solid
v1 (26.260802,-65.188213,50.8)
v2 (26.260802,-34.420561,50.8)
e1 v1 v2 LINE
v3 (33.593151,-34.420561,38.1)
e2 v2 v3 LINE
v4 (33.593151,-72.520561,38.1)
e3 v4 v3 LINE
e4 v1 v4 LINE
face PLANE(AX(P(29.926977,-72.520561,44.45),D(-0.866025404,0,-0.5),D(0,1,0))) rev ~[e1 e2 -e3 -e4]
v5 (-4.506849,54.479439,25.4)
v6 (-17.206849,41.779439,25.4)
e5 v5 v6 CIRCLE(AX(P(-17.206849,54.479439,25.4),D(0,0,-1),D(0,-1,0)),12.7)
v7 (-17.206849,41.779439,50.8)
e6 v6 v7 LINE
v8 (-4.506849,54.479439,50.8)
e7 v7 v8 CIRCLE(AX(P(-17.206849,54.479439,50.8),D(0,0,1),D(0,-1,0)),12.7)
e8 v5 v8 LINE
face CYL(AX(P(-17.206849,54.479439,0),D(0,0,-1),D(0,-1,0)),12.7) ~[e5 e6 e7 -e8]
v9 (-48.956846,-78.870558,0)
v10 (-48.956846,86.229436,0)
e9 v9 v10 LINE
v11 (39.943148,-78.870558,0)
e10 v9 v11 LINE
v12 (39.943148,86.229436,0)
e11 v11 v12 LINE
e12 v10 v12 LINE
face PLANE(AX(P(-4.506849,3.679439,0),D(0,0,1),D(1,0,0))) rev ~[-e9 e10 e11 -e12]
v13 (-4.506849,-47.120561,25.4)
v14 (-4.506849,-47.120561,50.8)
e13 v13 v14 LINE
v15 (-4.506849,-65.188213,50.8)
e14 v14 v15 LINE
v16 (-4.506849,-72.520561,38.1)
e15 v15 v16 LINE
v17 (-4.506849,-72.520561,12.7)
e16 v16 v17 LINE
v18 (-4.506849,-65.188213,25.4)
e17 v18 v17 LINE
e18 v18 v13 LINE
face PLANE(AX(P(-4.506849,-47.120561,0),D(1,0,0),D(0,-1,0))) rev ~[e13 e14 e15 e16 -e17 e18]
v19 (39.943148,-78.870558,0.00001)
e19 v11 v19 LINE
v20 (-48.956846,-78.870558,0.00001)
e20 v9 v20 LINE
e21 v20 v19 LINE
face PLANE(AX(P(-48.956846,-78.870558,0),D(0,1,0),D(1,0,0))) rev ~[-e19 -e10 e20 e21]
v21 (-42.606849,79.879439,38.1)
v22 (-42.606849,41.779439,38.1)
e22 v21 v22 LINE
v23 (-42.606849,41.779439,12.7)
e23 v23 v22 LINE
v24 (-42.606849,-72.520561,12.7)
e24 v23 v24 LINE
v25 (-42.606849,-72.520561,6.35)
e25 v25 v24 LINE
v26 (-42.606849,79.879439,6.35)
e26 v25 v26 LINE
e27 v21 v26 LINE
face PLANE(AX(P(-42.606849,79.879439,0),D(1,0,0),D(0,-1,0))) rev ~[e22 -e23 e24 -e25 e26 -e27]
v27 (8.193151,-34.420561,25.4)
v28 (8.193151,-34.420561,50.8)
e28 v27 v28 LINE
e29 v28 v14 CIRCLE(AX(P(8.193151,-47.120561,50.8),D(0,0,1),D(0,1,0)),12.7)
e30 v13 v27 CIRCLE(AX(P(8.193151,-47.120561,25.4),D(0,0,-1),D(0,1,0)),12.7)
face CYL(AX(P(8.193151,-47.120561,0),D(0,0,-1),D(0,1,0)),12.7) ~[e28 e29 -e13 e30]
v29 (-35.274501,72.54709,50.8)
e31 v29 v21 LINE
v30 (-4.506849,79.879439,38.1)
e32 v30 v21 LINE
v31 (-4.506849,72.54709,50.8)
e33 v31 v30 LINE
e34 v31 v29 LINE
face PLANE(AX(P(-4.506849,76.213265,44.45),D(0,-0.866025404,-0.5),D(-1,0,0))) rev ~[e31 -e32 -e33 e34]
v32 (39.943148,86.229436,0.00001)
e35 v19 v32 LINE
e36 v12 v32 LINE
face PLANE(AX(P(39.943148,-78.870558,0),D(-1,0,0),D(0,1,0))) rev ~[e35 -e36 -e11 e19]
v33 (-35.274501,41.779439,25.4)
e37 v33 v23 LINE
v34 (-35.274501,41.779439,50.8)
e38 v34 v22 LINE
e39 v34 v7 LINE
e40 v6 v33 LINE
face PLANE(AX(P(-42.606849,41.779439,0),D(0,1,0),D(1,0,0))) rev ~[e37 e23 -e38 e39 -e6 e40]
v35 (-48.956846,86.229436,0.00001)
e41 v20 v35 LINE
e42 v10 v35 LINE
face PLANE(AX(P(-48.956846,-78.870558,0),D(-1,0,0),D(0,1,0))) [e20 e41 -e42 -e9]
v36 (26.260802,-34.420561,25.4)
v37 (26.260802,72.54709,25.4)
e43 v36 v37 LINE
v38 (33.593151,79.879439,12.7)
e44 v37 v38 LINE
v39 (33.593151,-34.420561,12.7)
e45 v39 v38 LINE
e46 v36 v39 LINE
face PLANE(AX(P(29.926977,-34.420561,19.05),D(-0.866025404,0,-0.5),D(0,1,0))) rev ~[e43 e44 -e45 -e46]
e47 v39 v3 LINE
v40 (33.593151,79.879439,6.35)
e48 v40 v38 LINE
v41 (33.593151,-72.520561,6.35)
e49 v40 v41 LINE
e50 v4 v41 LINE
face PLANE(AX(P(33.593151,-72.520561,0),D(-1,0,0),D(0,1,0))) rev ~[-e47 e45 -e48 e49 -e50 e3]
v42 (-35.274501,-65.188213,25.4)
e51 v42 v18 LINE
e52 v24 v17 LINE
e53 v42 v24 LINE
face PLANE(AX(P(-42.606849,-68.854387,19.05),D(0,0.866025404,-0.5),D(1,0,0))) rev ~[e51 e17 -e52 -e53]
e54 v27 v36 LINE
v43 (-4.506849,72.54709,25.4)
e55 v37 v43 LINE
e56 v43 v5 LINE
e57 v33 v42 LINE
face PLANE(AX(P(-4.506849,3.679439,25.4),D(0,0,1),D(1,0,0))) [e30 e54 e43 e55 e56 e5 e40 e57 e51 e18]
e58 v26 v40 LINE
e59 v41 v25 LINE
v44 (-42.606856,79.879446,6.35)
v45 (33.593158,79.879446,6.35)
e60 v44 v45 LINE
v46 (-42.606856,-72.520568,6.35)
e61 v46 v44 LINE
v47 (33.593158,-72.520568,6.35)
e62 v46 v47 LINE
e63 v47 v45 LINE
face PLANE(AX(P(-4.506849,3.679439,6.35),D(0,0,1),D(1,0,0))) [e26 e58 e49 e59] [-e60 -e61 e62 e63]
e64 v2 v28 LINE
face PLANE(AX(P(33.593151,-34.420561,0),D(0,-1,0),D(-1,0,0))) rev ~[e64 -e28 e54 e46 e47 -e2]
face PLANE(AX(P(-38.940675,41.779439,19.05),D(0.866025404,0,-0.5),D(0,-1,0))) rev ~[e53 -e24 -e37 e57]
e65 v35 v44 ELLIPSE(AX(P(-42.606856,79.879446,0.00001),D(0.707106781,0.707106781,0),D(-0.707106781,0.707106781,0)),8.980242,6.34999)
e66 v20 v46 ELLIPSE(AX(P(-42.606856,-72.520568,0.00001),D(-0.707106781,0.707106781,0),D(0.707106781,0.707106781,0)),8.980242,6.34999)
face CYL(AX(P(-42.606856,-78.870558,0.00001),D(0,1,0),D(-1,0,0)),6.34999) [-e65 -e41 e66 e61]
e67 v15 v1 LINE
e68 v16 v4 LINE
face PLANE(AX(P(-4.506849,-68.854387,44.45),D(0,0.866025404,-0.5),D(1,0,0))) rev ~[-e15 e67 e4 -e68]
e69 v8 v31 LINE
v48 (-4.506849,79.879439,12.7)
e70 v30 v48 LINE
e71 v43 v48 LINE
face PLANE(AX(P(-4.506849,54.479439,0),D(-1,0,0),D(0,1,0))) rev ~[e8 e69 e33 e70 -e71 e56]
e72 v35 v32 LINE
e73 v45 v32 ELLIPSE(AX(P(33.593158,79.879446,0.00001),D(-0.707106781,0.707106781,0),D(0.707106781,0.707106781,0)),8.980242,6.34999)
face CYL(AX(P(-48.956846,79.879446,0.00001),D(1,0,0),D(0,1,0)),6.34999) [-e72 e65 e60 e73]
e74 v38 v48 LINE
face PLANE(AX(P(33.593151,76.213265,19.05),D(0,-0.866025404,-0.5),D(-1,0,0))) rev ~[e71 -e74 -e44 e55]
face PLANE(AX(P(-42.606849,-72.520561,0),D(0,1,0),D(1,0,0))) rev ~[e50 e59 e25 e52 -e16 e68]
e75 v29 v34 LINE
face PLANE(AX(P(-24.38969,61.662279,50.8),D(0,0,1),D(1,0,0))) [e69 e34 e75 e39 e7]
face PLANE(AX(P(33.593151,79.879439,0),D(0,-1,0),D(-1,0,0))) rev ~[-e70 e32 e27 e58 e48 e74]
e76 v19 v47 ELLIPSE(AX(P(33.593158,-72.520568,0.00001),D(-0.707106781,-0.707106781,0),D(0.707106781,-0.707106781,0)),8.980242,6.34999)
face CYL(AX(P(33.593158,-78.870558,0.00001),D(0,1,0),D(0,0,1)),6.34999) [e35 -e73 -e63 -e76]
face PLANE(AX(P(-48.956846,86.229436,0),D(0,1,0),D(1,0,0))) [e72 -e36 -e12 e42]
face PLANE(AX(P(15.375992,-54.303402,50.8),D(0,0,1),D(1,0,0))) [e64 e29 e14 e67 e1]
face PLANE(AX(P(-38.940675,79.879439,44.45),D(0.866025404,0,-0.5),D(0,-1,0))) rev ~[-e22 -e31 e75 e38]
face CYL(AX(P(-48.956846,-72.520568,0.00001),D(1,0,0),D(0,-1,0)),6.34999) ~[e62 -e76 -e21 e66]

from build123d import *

# Parameters (mm, degrees)
F1_DEPTH = 25.4
F2_DEPTH = 50.8
F0_W     = 88.899994537
F0_H     = 165.099994537
F3_DEPTH = 6.35
F4_R     = 6.34999
F5_SIZE2 = 12.7
F5_SIZE  = 7.3323484187
F6_SIZE2 = 12.7
F6_SIZE  = 7.3323484187
F7_SIZE2 = 12.7
F7_SIZE  = 7.3323484187


# Not quite as in the source:
# - a fillet or chamfer is up to 0.001 mm smaller than in the source, because OpenCascade refuses the exact size


with BuildPart() as f1:
    # F0 (on Top) → F1 (new body)
    with BuildSketch(Plane.XY):
        with BuildLine():
            Line((33.5931509164, 79.879438831), (-4.5068490836, 79.879438831))
            Line((-4.5068490836, 79.879438831), (-4.5068490836, 54.479438831))
            ThreePointArc((-4.5068490836, 54.479438831), (-8.2265929625, 45.49918271), (-17.2068490836, 41.779438831))
            Line((-17.2068490836, 41.779438831), (-42.6068490836, 41.779438831))
            Line((-42.6068490836, 41.779438831), (-42.6068490836, -72.520561169))
            Line((-42.6068490836, -72.520561169), (-4.5068490836, -72.520561169))
            Line((-4.5068490836, -72.520561169), (-4.5068490836, -47.120561169))
            ThreePointArc((-4.5068490836, -47.120561169), (-0.7871052047, -38.1403050479), (8.1931509164, -34.420561169))
            Line((8.1931509164, -34.420561169), (33.5931509164, -34.420561169))
            Line((33.5931509164, -34.420561169), (33.5931509164, 79.879438831))
        make_face()
        with BuildLine():
            Line((33.5931509164, -72.520561169), (33.5931509164, -34.420561169))
            Line((33.5931509164, -34.420561169), (8.1931509164, -34.420561169))
            ThreePointArc((8.1931509164, -34.420561169), (-0.7871052047, -38.1403050479), (-4.5068490836, -47.120561169))
            Line((-4.5068490836, -47.120561169), (-4.5068490836, -72.520561169))
            Line((-4.5068490836, -72.520561169), (33.5931509164, -72.520561169))
        make_face()
        with BuildLine():
            Line((-4.5068490836, 79.879438831), (-42.6068490836, 79.879438831))
            Line((-42.6068490836, 79.879438831), (-42.6068490836, 41.779438831))
            Line((-42.6068490836, 41.779438831), (-17.2068490836, 41.779438831))
            ThreePointArc((-17.2068490836, 41.779438831), (-8.2265929625, 45.49918271), (-4.5068490836, 54.479438831))
            Line((-4.5068490836, 54.479438831), (-4.5068490836, 79.879438831))
        make_face()
    extrude(amount=F1_DEPTH)

    # F0 (on Top) → F2 (join)
    with BuildSketch(Plane.XY):
        with BuildLine():
            Line((33.5931509164, -72.520561169), (33.5931509164, -34.420561169))
            Line((33.5931509164, -34.420561169), (8.1931509164, -34.420561169))
            ThreePointArc((8.1931509164, -34.420561169), (-0.7871052047, -38.1403050479), (-4.5068490836, -47.120561169))
            Line((-4.5068490836, -47.120561169), (-4.5068490836, -72.520561169))
            Line((-4.5068490836, -72.520561169), (33.5931509164, -72.520561169))
        make_face()
        with BuildLine():
            Line((-4.5068490836, 79.879438831), (-42.6068490836, 79.879438831))
            Line((-42.6068490836, 79.879438831), (-42.6068490836, 41.779438831))
            Line((-42.6068490836, 41.779438831), (-17.2068490836, 41.779438831))
            ThreePointArc((-17.2068490836, 41.779438831), (-8.2265929625, 45.49918271), (-4.5068490836, 54.479438831))
            Line((-4.5068490836, 54.479438831), (-4.5068490836, 79.879438831))
        make_face()
    extrude(amount=F2_DEPTH)

    # F0 (on Top) → F3 (join)
    with BuildSketch(Plane.XY):
        with Locations((-4.5068490836, 3.679438831)):
            Rectangle(F0_W, F0_H)
        Polygon((-42.6068490836, 41.779438831), (-42.6068490836, 79.879438831), (-4.5068490836, 79.879438831), (33.5931509164, 79.879438831), (33.5931509164, -34.420561169), (33.5931509164, -72.520561169), (-4.5068490836, -72.520561169), (-42.6068490836, -72.520561169), align=None, mode=Mode.SUBTRACT)
    extrude(amount=F3_DEPTH)

    # F4 (radius 6.35 in the source; OpenCascade refuses exactly that, so slightly less here)
    f4_edges = [f1.edges().sort_by_distance(p)[0] for p in [
        (-4.506849, -78.870558, 6.35),
        (39.943148, 3.679439, 6.35),
        (-48.956846, 3.679439, 6.35),
        (-4.506849, 86.229436, 6.35),
    ]]
    fillet(f4_edges, radius=F4_R)

    # F5
    f5_edges = [f1.edges().sort_by_distance(p)[0] for p in [
        (33.593151, 22.729439, 25.4),
        (14.543151, 79.879439, 25.4),
        (-23.556849, -72.520561, 25.4),
        (-42.606849, -15.370561, 25.4),
    ]]
    f5_side = f1.faces().sort_by_distance((-4.506849, 3.679439, 25.4))[0]
    chamfer(f5_edges, length=F5_SIZE, length2=F5_SIZE2, reference=f5_side)

    # F6
    f6_edges = [f1.edges().sort_by_distance(p)[0] for p in [
        (14.543151, -72.520561, 50.8),
        (33.593151, -53.470561, 50.8),
    ]]
    f6_side = f1.faces().sort_by_distance((14.939193, -53.866603, 50.8))[0]
    chamfer(f6_edges, length=F6_SIZE, length2=F6_SIZE2, reference=f6_side)

    # F7
    f7_edges = [f1.edges().sort_by_distance(p)[0] for p in [
        (-23.556849, 79.879439, 50.8),
        (-42.606849, 60.829439, 50.8),
    ]]
    f7_side = f1.faces().sort_by_distance((-23.952891, 61.225481, 50.8))[0]
    chamfer(f7_edges, length=F7_SIZE, length2=F7_SIZE2, reference=f7_side)


solid = f1.part
